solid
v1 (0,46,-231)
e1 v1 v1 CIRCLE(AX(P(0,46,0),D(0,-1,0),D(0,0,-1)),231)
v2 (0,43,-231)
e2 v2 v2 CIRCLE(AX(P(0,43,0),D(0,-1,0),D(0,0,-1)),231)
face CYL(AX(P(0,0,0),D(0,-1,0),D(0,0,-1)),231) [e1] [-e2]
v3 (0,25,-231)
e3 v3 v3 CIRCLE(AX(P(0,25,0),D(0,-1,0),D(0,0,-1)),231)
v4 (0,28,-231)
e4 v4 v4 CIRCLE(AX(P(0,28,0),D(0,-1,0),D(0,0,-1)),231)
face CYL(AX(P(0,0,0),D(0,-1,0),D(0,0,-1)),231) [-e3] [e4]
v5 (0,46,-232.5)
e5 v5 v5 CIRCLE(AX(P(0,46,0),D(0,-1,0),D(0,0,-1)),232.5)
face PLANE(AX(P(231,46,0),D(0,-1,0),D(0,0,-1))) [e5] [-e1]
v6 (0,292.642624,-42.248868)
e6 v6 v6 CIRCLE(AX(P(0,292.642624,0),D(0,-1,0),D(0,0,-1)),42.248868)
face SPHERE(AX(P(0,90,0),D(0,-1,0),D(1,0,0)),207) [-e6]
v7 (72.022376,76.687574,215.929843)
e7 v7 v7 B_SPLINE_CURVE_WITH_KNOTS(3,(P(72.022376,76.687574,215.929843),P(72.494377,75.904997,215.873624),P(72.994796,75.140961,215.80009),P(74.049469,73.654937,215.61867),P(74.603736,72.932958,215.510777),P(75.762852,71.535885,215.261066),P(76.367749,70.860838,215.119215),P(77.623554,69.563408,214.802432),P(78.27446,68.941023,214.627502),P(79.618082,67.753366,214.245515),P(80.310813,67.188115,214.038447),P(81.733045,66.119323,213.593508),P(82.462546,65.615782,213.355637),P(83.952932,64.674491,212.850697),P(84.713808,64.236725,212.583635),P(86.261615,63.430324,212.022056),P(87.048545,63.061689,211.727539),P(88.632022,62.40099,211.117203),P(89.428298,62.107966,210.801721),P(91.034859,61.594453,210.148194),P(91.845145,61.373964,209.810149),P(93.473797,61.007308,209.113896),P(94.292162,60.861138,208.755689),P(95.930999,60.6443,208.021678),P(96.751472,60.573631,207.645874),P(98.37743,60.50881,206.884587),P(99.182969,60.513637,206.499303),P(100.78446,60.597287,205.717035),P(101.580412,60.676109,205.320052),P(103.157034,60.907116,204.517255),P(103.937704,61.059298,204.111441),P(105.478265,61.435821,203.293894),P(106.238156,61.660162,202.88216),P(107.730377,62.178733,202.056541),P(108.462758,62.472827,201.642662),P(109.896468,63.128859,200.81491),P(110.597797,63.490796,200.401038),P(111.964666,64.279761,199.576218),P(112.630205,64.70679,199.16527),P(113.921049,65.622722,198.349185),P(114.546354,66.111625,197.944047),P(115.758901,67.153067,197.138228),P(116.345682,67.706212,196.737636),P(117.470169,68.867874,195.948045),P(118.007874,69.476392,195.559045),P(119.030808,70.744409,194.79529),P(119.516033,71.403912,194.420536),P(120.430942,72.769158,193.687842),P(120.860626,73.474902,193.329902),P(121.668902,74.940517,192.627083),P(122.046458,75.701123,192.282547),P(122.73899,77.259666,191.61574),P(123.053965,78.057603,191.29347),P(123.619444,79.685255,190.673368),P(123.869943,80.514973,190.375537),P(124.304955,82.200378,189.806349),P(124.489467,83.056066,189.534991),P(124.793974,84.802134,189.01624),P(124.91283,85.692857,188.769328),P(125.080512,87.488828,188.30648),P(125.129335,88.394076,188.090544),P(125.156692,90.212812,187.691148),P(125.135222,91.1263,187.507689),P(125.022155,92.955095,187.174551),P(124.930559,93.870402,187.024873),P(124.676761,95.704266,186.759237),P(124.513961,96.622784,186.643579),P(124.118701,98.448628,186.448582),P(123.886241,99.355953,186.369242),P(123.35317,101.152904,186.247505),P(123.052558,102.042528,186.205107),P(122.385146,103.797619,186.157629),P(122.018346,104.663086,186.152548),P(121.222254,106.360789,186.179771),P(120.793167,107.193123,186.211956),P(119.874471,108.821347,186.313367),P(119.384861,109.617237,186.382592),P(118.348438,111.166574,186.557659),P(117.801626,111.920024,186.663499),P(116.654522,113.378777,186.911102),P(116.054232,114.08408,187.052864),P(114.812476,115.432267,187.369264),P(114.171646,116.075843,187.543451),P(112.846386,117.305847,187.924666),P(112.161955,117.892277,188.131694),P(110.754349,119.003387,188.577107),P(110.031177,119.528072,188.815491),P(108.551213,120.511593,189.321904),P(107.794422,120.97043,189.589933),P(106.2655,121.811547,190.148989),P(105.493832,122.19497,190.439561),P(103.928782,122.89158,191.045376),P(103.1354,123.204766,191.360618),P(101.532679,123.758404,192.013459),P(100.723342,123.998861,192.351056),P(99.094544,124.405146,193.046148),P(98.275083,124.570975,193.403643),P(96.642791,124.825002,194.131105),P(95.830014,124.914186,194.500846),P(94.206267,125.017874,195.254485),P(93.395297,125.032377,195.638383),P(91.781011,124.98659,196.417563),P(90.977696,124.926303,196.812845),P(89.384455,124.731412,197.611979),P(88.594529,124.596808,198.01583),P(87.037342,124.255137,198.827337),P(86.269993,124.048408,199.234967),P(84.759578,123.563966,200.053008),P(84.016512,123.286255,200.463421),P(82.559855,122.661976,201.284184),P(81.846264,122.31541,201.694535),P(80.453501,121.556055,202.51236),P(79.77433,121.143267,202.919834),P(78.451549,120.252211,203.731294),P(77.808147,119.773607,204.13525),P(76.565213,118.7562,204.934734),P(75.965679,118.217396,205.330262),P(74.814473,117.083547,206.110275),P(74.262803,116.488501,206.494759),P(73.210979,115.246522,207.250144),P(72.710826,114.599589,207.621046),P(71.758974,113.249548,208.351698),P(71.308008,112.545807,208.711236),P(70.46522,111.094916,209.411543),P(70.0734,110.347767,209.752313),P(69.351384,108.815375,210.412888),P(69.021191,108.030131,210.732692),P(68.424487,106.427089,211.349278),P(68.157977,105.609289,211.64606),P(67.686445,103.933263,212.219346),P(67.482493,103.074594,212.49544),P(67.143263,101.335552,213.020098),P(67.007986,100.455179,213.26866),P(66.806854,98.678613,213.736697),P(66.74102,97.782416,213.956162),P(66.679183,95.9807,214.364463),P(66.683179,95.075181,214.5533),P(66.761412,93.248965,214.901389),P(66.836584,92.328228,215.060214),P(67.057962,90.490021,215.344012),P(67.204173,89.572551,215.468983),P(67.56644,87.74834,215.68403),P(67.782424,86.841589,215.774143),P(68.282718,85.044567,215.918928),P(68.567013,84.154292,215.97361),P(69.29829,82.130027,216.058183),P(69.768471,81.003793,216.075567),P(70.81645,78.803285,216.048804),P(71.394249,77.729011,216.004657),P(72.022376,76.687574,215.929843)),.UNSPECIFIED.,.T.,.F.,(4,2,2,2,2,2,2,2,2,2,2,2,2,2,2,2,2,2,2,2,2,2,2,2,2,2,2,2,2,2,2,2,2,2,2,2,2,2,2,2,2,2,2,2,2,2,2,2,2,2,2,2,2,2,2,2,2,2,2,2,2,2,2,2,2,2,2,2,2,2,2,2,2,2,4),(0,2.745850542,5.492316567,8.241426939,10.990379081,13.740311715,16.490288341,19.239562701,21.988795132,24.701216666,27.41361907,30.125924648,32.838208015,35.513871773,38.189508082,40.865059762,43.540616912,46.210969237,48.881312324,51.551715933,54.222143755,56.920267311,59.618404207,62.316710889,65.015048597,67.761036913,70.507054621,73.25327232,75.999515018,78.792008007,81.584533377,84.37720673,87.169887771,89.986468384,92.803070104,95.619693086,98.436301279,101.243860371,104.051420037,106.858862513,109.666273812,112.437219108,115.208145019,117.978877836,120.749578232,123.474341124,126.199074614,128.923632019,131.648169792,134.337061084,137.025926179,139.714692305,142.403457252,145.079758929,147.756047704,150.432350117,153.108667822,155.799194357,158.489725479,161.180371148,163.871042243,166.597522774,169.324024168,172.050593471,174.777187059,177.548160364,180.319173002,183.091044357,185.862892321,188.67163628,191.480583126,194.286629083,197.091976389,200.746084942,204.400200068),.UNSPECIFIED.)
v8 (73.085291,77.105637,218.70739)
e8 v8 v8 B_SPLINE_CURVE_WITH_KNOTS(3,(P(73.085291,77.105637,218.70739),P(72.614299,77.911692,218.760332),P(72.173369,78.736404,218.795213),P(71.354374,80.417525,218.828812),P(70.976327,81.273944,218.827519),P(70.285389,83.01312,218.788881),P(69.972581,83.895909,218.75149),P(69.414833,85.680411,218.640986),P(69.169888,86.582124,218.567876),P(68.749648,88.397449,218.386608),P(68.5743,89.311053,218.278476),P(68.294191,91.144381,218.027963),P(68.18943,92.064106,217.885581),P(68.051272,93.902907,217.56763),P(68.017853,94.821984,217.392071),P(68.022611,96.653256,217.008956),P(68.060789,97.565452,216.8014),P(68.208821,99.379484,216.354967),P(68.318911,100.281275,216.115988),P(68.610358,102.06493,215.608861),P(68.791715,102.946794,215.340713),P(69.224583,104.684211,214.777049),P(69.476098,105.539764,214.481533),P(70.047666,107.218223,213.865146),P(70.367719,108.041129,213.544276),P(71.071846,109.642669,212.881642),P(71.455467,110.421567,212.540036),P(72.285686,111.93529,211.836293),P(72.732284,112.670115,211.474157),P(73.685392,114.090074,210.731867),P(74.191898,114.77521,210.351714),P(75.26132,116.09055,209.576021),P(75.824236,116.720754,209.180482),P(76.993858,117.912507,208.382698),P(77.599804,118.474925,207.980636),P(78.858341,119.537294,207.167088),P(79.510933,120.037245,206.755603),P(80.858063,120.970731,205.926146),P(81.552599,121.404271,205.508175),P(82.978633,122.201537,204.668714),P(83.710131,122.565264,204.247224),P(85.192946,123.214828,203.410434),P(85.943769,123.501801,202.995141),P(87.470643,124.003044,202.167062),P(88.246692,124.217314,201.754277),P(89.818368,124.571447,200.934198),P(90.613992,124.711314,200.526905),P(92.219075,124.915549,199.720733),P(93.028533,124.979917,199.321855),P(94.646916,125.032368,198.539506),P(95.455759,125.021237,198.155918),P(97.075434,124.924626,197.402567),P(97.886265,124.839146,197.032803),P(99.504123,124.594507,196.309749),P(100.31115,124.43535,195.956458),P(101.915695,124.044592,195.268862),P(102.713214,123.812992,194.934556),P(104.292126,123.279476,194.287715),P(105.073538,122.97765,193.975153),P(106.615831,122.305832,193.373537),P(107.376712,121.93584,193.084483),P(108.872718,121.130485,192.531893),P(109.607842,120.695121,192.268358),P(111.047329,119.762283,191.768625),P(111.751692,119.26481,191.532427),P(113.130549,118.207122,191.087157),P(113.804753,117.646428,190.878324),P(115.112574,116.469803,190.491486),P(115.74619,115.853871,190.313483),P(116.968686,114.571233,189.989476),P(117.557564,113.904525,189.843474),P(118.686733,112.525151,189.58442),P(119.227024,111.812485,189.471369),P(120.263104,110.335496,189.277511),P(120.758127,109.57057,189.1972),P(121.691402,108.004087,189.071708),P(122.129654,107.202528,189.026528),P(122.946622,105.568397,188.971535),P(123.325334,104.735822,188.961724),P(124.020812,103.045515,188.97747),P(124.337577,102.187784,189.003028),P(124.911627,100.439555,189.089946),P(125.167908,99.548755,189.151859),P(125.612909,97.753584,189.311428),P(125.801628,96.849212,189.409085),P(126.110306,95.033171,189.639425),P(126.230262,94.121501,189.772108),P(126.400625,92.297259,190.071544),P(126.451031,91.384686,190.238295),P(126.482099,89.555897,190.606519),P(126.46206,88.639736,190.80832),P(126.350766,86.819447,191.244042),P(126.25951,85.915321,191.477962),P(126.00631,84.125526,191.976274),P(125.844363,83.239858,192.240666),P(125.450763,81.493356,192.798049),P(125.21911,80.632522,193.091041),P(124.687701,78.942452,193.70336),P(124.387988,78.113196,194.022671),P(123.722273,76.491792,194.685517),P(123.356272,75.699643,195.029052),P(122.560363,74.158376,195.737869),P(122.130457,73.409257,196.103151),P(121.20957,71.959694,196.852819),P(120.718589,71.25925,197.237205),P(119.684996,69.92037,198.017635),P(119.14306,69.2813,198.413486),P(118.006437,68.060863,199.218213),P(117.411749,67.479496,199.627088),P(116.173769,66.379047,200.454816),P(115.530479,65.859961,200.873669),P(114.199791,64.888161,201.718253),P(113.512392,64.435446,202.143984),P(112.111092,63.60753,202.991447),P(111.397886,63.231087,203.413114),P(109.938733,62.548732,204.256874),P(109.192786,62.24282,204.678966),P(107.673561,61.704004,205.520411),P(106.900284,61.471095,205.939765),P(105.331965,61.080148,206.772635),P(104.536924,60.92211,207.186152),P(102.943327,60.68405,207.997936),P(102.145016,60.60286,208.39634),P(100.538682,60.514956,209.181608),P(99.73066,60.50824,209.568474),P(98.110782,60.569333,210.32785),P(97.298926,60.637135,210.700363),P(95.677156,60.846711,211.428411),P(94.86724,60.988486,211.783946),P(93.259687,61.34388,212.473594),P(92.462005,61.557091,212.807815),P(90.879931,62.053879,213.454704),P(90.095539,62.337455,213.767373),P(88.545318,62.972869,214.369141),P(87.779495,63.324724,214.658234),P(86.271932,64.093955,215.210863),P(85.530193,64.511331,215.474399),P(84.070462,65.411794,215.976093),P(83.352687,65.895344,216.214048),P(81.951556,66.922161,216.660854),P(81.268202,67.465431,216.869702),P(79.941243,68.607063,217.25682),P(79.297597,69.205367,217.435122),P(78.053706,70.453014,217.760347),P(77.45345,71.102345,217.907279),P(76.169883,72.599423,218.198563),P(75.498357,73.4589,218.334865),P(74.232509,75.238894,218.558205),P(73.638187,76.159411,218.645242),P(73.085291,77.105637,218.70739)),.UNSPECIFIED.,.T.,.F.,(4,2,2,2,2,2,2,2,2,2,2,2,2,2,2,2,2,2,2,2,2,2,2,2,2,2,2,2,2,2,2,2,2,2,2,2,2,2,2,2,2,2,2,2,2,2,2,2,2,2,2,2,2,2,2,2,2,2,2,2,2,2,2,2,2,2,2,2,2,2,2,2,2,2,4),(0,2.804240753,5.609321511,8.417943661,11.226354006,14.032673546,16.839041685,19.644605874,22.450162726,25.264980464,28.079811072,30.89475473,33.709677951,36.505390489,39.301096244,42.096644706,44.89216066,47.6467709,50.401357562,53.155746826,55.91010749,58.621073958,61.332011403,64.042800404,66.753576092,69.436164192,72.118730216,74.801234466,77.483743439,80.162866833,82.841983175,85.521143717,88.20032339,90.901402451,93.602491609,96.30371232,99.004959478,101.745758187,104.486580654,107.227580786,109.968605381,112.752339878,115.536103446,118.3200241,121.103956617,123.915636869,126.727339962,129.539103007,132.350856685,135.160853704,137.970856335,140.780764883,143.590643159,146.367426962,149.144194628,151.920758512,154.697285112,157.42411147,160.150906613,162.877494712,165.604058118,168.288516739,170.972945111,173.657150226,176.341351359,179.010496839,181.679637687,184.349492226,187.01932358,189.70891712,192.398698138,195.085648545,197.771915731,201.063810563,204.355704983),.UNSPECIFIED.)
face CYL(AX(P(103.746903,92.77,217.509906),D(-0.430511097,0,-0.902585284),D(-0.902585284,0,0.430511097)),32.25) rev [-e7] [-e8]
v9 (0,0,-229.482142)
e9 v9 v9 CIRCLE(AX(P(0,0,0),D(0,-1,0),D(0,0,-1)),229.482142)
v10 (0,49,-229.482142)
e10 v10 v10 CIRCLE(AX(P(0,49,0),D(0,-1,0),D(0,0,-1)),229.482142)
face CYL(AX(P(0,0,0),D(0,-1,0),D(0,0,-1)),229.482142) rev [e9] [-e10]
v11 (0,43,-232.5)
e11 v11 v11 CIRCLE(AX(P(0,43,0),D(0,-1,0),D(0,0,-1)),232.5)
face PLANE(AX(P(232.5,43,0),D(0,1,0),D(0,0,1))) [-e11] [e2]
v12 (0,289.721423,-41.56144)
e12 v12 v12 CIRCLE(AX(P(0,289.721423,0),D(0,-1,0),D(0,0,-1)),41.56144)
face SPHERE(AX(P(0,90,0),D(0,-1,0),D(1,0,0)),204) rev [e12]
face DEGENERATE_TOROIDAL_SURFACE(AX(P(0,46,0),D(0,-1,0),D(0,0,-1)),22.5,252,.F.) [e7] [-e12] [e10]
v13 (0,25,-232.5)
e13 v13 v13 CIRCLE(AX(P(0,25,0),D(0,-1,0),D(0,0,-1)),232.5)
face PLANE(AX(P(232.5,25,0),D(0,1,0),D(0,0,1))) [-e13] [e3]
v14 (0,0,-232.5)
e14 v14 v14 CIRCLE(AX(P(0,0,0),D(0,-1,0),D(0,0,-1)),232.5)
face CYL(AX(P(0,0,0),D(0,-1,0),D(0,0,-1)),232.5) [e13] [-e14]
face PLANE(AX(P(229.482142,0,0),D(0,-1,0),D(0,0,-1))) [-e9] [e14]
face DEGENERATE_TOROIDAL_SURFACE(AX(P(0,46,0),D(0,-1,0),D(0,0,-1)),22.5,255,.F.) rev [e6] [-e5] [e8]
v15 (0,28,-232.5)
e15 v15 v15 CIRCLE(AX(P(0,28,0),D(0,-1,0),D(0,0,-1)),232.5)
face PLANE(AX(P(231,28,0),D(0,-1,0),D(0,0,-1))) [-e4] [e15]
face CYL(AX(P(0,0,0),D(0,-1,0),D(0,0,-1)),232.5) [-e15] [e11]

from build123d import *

# Parameters (mm, degrees)
CUT_EXTRUDE_2_OUTLINE_W = 32.25
CUT_EXTRUDE_2_OUTLINE_H = 15.296775487


# Read off the part's stored shape, not the designer's step: Вырез-Вытянуть2
with BuildPart() as part:
    # Эскиз1 → Повернуть1 (revolve)
    with BuildSketch(Plane.XY, mode=Mode.PRIVATE) as revolve_1_sk:
        with BuildLine():
            Line((232.5, 0), (232.5, 25))
            Line((232.5, 25), (231, 25))
            Line((231, 25), (231, 28))
            Line((231, 28), (232.5, 28))
            Line((232.5, 28), (232.5, 43))
            Line((232.5, 43), (231, 43))
            Line((231, 43), (231, 46))
            Line((231, 46), (232.5, 46))
            ThreePointArc((232.5, 46), (179.410823656, 201.746650977), (42.248868308, 292.642624161))
            ThreePointArc((42.248868308, 292.642624161), (21.236487454, 295.907774503), (0, 297))
            Line((0, 297), (0, 294))
            ThreePointArc((0, 294), (20.890545181, 292.927536628), (41.561439926, 289.721422765))
            ThreePointArc((41.561439926, 289.721422765), (176.139339757, 201.069057845), (229.482142224, 49))
            Line((229.482142224, 49), (229.482142224, 0))
            Line((229.482142224, 0), (232.5, 0))
        make_face()
    revolve(revolve_1_sk.sketch.rotate(Axis((0, 0, 0), (0, 1, 0)), 90), axis=Axis((0, 0, 0), (0, 1, 0)))

    # Вырез-Вытянуть2 outline → Вырез-Вытянуть2 (revolve, cut)
    with BuildSketch(Plane(origin=(0, 92.77, 0), x_dir=(0.9025852843498602, 0, -0.4305110968082962), z_dir=(0, -1, 0))):
        with Locations((16.125, 224.438327692)):
            Rectangle(CUT_EXTRUDE_2_OUTLINE_W, CUT_EXTRUDE_2_OUTLINE_H)
    revolve(axis=Axis((0, 92.77, 0), (0.4305110968082962, 0, 0.9025852843498602)), mode=Mode.SUBTRACT)


solid = part.part
